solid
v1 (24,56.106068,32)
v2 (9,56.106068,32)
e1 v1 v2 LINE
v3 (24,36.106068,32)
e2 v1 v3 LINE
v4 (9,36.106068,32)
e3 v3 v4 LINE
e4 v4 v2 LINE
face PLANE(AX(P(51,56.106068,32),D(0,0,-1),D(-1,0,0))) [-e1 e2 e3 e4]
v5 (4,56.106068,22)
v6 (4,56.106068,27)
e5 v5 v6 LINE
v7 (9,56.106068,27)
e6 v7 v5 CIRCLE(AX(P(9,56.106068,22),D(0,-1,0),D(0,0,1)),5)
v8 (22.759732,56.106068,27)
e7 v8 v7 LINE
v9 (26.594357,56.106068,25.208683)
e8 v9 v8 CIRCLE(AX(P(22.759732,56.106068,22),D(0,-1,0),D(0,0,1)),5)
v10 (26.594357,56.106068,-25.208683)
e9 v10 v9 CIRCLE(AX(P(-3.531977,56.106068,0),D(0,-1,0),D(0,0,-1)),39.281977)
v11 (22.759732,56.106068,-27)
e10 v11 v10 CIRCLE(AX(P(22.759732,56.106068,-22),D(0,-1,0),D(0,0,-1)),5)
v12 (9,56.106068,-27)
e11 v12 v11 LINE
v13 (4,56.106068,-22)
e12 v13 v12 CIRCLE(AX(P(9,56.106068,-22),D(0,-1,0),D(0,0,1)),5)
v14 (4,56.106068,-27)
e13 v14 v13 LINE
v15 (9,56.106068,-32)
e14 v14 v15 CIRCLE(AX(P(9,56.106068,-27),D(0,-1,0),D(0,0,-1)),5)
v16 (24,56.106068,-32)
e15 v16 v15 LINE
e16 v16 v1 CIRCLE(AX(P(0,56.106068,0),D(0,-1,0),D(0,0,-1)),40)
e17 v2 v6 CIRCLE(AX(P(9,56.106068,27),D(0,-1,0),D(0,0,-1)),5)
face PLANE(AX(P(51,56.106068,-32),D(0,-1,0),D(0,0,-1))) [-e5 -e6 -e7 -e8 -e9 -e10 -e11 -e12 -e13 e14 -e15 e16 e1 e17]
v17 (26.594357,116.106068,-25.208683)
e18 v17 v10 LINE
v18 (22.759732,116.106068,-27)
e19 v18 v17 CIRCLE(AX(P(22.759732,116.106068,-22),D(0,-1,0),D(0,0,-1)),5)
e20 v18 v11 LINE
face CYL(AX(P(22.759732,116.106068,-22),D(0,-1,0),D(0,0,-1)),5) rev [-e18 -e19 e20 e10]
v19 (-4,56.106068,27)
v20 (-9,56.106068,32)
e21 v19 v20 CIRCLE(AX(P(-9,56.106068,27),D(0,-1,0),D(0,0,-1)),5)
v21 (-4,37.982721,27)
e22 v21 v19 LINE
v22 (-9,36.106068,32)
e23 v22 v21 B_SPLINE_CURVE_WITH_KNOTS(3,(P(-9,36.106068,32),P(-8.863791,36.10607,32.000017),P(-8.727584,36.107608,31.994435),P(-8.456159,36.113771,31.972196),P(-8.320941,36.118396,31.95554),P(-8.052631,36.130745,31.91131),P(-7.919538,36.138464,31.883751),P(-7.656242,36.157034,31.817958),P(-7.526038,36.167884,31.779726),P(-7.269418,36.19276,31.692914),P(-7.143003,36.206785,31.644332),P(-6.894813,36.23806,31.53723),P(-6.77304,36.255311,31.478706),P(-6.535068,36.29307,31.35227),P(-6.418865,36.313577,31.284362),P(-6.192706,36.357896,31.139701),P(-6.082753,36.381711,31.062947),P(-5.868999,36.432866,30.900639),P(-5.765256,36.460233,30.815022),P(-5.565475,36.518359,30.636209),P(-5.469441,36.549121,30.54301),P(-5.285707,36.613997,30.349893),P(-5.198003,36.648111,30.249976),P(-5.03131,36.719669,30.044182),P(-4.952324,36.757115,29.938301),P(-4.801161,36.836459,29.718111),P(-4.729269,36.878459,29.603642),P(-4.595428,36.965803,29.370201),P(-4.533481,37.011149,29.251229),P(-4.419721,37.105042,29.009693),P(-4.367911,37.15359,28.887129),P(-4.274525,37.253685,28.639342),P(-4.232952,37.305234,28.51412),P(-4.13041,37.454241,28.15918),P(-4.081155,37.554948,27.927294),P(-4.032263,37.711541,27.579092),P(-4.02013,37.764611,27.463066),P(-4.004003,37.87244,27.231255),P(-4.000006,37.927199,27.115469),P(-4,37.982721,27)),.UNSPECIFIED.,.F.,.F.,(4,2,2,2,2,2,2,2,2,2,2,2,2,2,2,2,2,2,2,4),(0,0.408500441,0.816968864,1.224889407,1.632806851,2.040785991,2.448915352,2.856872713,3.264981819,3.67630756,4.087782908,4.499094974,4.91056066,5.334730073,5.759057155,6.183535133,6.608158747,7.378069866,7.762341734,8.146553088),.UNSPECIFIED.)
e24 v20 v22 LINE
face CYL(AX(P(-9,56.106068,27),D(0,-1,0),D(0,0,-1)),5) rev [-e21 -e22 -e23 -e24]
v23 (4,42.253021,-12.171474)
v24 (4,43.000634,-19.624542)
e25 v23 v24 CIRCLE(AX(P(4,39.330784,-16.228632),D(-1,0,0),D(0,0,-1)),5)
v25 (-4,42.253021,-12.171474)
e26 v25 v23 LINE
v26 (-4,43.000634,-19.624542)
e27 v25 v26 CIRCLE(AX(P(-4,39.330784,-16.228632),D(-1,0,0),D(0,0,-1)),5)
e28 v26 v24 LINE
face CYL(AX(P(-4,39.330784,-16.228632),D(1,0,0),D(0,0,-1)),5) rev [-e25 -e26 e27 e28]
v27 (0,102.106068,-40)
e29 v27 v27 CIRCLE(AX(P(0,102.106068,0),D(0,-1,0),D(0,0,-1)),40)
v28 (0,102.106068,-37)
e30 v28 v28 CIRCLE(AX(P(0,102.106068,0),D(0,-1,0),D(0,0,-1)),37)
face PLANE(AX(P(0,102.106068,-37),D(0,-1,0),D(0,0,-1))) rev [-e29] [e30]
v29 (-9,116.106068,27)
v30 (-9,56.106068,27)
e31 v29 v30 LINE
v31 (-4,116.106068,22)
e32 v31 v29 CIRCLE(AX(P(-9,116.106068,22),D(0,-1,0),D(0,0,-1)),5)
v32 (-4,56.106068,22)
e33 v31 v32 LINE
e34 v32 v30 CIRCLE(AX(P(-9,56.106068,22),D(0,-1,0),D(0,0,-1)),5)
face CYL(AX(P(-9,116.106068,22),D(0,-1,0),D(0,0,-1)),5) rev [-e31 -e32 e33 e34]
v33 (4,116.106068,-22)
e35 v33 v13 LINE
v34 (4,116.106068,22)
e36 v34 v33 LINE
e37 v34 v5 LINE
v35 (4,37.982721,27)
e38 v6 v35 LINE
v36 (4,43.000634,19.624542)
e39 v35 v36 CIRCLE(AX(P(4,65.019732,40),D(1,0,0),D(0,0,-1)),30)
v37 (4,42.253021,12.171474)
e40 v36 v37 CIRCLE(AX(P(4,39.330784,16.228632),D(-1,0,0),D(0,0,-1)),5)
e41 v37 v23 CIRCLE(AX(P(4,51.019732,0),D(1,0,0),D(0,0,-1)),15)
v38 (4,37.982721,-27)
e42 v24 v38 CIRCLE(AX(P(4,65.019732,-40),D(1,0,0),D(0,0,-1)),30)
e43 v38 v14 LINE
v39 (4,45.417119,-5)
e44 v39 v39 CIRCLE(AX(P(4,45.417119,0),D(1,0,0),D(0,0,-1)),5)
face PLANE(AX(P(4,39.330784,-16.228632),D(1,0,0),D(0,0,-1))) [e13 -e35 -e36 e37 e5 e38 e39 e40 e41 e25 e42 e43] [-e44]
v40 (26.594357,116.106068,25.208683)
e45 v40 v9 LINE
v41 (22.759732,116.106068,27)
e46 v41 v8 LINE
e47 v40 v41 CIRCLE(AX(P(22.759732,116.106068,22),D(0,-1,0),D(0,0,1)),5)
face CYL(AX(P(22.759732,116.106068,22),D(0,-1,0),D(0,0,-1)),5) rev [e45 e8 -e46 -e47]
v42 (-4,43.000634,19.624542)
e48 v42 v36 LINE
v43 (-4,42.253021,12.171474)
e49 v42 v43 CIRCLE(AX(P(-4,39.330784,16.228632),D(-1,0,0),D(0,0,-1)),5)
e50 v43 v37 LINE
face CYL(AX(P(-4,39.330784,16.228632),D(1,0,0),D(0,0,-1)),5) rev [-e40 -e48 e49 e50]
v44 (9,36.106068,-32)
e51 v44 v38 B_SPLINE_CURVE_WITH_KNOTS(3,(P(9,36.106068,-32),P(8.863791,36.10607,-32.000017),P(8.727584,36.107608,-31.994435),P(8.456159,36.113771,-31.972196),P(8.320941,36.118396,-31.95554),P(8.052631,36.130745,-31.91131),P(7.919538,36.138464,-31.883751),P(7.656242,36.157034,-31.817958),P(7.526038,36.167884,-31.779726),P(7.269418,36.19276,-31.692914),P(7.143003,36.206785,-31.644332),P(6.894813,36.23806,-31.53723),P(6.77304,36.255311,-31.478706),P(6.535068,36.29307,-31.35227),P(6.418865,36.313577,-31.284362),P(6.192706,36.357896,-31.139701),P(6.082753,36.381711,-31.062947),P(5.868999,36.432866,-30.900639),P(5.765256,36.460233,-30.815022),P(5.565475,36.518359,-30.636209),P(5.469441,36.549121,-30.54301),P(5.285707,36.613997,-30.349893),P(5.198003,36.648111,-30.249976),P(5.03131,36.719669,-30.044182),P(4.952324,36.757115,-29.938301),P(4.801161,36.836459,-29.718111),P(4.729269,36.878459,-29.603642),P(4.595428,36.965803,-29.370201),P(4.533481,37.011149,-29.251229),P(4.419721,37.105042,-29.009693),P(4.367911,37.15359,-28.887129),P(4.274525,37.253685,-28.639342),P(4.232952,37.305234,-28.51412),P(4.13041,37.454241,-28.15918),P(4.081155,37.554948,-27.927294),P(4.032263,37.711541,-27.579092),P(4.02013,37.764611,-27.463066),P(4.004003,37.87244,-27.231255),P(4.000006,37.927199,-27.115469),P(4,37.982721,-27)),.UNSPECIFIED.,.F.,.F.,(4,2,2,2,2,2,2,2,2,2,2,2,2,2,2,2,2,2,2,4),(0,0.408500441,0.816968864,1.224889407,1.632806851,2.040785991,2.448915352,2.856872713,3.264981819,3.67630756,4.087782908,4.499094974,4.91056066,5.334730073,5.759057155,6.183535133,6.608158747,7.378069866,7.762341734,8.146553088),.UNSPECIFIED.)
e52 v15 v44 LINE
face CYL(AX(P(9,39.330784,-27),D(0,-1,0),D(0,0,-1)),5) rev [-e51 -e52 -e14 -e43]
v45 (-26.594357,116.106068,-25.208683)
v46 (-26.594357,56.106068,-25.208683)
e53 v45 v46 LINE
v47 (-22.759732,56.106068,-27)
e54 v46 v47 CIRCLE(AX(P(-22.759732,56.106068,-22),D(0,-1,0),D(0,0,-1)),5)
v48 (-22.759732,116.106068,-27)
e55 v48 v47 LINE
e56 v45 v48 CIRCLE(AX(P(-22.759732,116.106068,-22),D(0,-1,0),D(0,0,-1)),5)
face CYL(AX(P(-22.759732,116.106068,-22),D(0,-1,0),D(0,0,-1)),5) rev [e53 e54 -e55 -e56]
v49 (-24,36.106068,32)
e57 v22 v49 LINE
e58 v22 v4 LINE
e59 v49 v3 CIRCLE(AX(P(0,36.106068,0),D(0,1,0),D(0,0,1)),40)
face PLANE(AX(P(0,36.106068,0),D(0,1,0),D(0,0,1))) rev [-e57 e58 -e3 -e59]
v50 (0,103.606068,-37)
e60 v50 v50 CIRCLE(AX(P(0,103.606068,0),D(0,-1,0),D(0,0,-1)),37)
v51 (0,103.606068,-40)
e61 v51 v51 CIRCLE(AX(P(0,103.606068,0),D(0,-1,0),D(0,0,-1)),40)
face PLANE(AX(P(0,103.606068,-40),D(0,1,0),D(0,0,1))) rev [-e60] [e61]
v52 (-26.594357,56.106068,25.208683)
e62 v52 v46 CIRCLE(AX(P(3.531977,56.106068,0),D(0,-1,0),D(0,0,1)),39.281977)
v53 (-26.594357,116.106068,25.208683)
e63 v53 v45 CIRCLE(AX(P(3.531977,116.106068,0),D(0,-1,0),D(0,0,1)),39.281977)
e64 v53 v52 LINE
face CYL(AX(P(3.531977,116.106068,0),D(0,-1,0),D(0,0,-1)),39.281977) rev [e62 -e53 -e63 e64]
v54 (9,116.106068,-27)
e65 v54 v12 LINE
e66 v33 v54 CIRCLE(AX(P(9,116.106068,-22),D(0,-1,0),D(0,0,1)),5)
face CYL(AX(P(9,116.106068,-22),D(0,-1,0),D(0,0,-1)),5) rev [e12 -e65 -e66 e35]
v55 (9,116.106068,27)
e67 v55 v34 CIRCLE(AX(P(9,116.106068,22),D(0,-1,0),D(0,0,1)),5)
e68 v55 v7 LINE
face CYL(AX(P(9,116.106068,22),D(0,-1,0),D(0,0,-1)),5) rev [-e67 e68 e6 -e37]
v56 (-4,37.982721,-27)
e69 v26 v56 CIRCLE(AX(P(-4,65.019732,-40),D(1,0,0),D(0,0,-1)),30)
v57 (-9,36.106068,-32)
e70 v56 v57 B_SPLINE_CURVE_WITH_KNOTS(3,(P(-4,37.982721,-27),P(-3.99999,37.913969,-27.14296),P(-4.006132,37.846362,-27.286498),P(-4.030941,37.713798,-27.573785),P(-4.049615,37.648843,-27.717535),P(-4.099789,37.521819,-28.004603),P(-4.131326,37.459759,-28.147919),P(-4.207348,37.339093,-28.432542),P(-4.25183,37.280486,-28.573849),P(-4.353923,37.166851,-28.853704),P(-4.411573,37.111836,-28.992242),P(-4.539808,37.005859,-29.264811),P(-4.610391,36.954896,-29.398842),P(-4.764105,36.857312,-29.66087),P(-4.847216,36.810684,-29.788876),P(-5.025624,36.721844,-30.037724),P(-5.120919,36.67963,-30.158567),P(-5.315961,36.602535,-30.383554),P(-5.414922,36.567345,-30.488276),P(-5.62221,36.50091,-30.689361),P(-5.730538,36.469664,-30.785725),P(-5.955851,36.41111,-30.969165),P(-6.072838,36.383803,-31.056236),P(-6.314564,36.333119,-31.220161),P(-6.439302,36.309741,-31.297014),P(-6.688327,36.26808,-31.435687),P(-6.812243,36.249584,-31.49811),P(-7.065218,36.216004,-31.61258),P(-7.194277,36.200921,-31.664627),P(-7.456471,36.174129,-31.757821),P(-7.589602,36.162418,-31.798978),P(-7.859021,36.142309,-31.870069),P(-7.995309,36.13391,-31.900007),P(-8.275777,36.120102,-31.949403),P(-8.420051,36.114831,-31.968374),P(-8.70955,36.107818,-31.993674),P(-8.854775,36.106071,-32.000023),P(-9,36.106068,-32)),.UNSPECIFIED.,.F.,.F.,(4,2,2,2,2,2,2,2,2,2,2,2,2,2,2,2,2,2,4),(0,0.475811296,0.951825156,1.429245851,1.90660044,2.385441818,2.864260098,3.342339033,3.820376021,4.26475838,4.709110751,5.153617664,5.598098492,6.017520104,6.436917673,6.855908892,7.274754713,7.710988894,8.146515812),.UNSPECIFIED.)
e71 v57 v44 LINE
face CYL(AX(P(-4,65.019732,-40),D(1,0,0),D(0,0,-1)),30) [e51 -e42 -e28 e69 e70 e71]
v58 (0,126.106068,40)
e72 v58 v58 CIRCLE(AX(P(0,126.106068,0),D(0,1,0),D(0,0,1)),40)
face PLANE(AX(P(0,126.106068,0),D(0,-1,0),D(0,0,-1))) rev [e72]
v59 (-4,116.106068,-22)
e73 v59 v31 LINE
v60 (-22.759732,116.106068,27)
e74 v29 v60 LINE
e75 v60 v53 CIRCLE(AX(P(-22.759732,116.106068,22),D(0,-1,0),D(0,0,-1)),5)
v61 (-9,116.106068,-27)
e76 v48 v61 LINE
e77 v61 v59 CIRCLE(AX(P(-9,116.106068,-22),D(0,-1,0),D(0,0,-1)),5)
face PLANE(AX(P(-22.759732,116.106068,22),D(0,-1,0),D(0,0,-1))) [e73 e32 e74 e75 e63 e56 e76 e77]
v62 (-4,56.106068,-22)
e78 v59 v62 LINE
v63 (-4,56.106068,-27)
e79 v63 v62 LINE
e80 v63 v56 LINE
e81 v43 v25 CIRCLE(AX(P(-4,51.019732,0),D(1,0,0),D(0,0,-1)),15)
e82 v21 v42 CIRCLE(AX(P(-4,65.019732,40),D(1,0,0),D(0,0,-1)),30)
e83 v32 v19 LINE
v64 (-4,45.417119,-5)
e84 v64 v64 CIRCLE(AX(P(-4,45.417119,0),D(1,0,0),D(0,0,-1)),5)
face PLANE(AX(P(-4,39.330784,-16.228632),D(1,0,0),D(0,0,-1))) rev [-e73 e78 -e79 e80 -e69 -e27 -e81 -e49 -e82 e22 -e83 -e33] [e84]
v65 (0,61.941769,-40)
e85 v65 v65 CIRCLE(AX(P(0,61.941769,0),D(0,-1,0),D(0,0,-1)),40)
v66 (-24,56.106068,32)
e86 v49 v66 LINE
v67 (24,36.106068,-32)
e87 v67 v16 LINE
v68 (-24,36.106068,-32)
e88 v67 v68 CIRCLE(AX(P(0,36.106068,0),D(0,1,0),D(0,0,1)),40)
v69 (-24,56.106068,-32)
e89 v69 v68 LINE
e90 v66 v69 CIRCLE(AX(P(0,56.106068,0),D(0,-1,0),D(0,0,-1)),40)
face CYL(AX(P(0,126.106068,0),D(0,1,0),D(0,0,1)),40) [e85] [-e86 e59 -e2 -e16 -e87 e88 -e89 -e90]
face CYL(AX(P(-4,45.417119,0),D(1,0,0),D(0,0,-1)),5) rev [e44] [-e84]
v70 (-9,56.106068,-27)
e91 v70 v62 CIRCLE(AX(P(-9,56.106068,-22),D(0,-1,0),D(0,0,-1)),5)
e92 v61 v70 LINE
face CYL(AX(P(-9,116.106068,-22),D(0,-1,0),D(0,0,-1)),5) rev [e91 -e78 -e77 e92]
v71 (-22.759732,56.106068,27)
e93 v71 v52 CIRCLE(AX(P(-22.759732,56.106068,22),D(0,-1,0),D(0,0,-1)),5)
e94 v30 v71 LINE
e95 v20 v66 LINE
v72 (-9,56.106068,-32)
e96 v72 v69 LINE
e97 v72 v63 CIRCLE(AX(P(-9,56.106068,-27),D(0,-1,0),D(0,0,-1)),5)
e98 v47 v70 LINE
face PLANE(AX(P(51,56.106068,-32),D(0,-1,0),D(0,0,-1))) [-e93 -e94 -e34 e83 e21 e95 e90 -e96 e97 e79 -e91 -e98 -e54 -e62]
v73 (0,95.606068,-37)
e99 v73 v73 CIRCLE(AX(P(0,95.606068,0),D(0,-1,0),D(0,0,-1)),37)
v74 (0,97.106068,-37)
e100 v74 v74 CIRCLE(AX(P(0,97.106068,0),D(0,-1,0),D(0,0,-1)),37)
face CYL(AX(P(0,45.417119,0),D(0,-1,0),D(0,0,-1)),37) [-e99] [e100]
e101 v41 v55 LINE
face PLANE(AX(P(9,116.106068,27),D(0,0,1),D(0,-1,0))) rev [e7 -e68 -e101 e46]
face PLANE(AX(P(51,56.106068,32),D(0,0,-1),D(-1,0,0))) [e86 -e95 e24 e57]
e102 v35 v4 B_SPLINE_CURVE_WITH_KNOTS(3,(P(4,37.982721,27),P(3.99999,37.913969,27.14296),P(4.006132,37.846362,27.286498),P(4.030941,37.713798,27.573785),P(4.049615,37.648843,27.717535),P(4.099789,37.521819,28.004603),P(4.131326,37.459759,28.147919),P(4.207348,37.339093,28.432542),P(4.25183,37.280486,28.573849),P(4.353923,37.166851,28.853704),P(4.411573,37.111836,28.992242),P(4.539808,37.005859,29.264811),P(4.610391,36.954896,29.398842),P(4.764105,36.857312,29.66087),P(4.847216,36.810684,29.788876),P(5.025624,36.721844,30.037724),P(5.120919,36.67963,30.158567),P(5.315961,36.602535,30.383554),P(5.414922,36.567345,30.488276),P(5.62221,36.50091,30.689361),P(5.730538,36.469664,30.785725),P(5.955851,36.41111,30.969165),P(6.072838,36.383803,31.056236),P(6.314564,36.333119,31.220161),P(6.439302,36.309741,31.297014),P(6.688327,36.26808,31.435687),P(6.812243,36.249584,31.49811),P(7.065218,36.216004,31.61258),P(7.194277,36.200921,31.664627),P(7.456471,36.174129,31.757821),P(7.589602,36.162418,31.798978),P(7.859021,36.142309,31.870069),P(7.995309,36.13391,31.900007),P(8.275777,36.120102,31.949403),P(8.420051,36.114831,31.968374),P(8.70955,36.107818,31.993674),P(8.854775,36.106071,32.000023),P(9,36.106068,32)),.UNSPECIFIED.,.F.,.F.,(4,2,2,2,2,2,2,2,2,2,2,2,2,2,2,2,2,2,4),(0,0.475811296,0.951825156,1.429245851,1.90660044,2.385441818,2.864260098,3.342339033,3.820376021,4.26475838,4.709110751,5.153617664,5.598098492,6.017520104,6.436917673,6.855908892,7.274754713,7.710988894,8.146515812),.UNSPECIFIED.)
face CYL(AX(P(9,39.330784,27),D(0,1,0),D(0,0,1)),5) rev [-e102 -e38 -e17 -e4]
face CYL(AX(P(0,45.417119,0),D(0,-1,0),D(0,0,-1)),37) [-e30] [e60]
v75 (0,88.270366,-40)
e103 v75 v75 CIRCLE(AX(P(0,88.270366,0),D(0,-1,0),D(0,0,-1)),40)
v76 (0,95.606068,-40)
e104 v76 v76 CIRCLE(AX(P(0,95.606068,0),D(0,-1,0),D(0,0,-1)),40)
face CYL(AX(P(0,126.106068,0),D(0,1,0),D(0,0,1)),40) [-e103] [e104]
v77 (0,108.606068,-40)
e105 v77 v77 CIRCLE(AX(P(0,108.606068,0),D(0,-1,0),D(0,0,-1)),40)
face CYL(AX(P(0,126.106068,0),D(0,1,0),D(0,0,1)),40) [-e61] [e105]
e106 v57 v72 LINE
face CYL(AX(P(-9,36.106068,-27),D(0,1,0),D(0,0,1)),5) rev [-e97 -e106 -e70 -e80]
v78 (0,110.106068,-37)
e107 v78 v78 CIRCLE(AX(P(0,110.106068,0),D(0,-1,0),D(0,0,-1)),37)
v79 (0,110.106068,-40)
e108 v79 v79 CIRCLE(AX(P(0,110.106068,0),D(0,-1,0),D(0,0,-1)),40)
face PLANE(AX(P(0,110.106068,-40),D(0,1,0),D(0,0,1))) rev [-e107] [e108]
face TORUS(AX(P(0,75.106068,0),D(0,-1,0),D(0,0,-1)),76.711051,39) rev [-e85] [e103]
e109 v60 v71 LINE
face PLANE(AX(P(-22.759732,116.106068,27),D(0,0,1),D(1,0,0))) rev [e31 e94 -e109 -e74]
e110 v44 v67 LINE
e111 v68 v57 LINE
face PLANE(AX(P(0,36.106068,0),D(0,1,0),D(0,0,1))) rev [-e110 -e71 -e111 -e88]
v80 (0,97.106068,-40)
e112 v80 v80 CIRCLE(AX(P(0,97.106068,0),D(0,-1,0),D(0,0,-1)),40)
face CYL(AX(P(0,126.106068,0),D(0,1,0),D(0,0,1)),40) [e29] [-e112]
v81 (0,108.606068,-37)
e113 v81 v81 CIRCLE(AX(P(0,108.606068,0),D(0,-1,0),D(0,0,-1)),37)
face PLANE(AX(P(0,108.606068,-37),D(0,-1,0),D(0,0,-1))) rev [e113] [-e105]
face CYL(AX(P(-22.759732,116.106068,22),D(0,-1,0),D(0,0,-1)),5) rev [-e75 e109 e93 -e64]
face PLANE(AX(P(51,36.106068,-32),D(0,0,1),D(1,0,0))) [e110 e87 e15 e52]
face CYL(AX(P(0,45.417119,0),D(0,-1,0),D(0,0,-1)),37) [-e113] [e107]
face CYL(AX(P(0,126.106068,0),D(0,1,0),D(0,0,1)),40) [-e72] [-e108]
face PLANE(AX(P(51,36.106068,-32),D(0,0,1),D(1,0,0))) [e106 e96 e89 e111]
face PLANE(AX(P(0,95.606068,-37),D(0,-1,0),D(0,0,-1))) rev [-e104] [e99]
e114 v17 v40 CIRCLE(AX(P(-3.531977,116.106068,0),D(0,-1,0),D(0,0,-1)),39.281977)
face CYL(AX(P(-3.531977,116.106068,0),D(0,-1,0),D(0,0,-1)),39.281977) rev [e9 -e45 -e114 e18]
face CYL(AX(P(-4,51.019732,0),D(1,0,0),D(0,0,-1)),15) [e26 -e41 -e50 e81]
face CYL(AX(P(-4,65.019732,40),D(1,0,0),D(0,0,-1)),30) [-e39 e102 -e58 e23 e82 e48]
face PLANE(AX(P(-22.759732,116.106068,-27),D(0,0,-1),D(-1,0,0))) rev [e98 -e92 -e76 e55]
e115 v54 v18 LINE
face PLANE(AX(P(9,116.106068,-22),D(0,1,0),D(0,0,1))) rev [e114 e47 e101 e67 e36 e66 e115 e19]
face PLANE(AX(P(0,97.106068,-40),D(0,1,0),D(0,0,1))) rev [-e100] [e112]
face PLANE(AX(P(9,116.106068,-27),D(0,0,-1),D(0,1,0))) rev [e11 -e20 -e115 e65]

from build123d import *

# Parameters (mm, degrees)
SKETCH2_W                = 40
SKETCH2_H                = 70
SKETCH4_W                = 40
SKETCH4_H                = 20
CUT_EXTRUDE1_DEPTH       = 51
CUT_EXTRUDE1_DEPTH_BACK  = 47
SKETCH5_W                = 64
SKETCH5_H                = 20
BOSS_EXTRUDE1_DEPTH      = 4
BOSS_EXTRUDE1_DEPTH_BACK = 4
SKETCH3_R                = 5
FILLET2_R                = 5
FILLET3_R                = 5
CUT_EXTRUDE2_DEPTH       = 60
SKETCH8_W                = 3
SKETCH8_H                = 1.5


with BuildPart() as part:
    # Sketch2 → Revolve1 (revolve)
    with BuildSketch(Plane(origin=(0, 0, 0), x_dir=(0, 0, -1), z_dir=(1, 0, 0)), mode=Mode.PRIVATE) as revolve1_sk:
        with Locations((20, 91.106067618)):
            Rectangle(SKETCH2_W, SKETCH2_H)
    revolve(revolve1_sk.sketch.rotate(Axis((0, 126.106067618, 0), (0, -1, 0)), 180), axis=Axis((0, 126.106067618, 0), (0, -1, 0)))

    # Sketch4 → Revolve2 (revolve)
    with BuildSketch(Plane(origin=(0, 0, 0), x_dir=(0, 0, -1), z_dir=(1, 0, 0)), mode=Mode.PRIVATE) as revolve2_sk:
        with Locations((20, 46.106067618)):
            Rectangle(SKETCH4_W, SKETCH4_H)
    revolve(revolve2_sk.sketch.rotate(Axis((0, 56.106067618, 0), (0, -1, 0)), 180), axis=Axis((0, 56.106067618, 0), (0, -1, 0)))

    # Sketch5 → Cut-Extrude1 (cut, two sides: drawn at the far end of the back side and taken through both)
    with BuildSketch(Plane(origin=(0, 0, 0), x_dir=(0, 0, -1), z_dir=(1, 0, 0)).offset(-CUT_EXTRUDE1_DEPTH_BACK)):
        with Locations((0, 46.106067618)):
            Rectangle(SKETCH5_W, SKETCH5_H)
    extrude(amount=CUT_EXTRUDE1_DEPTH + CUT_EXTRUDE1_DEPTH_BACK, mode=Mode.SUBTRACT)

    # Sketch3 → Boss-Extrude1 (add, two sides: drawn at the far end of the back side and taken through both)
    with BuildSketch(Plane(origin=(0, 0, 0), x_dir=(0, 0, -1), z_dir=(1, 0, 0)).offset(-BOSS_EXTRUDE1_DEPTH_BACK)):
        with BuildLine():
            Line((-32, 56.106067618), (-14.456832295, 56.106067618))
            Line((-14.456832295, 56.106067618), (14.456832295, 56.106067618))
            Line((14.456832295, 56.106067618), (32, 56.106067618))
            Line((32, 56.106067618), (32, 36.106067618))
            ThreePointArc((32, 36.106067618), (25.399471898, 38.812393939), (19.624541582, 43.00063381))
            ThreePointArc((19.624541582, 43.00063381), (15.729589271, 44.305817394), (12.171473884, 42.25302111))
            ThreePointArc((12.171473884, 42.25302111), (0, 36.019732208), (-12.171473884, 42.25302111))
            ThreePointArc((-12.171473884, 42.25302111), (-15.729589271, 44.305817394), (-19.624541582, 43.00063381))
            ThreePointArc((-19.624541582, 43.00063381), (-25.399471898, 38.812393939), (-32, 36.106067618))
            Line((-32, 36.106067618), (-32, 56.106067618))
        make_face()
        with Locations((0, 45.417119487)):
            Circle(SKETCH3_R, mode=Mode.SUBTRACT)
    extrude(amount=BOSS_EXTRUDE1_DEPTH + BOSS_EXTRUDE1_DEPTH_BACK)

    # Fillet2
    # the kernel refuses this fillet: 5 mm, written as the material it adds along each edge
    with BuildSketch(Plane(origin=(4, 36.106067618, 32), x_dir=(1, 0, 0), z_dir=(0, 1, 0))) as fillet2_piece_1_section:
        with BuildLine():
            CenterArc((FILLET2_R, FILLET2_R), FILLET2_R, 180, 90)
            Line((0, FILLET2_R), (0, 0))
            Line((0, 0), (FILLET2_R, 0))
        make_face()
    fillet2_piece_1 = extrude(amount=32.5, mode=Mode.PRIVATE)
    fillet2_piece_1 = fillet2_piece_1 & Plane(origin=(5.143552766, 65.019732208, 40), x_dir=(0, -0.7339699466021848, -0.6791819472606629), z_dir=(-1, 0, 0)) * Cylinder(30, 85, mode=Mode.PRIVATE)
    add(fillet2_piece_1)

    # Fillet3
    # the kernel refuses this fillet: 5 mm, written as the material it adds along each edge
    with BuildSketch(Plane(origin=(-4, 36.106067618, 32), x_dir=(0, 0, -1), z_dir=(0, 1, 0))) as fillet3_piece_1_section:
        with BuildLine():
            CenterArc((FILLET3_R, FILLET3_R), FILLET3_R, 180, 90)
            Line((0, FILLET3_R), (0, 0))
            Line((0, 0), (FILLET3_R, 0))
        make_face()
    fillet3_piece_1 = extrude(amount=32.5, mode=Mode.PRIVATE)
    fillet3_piece_1 = fillet3_piece_1 & Plane(origin=(-5.143552934, 65.019732208, 40), x_dir=(0, -0.7339699466019316, -0.6791819472609367), z_dir=(-1, 0, 0)) * Cylinder(30, 85, mode=Mode.PRIVATE)
    add(fillet3_piece_1)
    with BuildSketch(Plane(origin=(-4, 68.606067618, -32), x_dir=(0, 0, 1), z_dir=(0, -1, 0))) as fillet3_piece_2_section:
        with BuildLine():
            CenterArc((FILLET3_R, FILLET3_R), FILLET3_R, 180, 90)
            Line((0, FILLET3_R), (0, 0))
            Line((0, 0), (FILLET3_R, 0))
        make_face()
    fillet3_piece_2 = extrude(amount=32.5, mode=Mode.PRIVATE)
    fillet3_piece_2 = fillet3_piece_2 & Plane(origin=(-5.131975571, 65.019732208, -40), x_dir=(0, -0.9637888196533986, 0.26666666666666256), z_dir=(-1, 0, 0)) * Cylinder(30, 85, mode=Mode.PRIVATE)
    add(fillet3_piece_2)
    with BuildSketch(Plane(origin=(4, 68.606067618, -32), x_dir=(0, 0, 1), z_dir=(0, -1, 0))) as fillet3_piece_3_section:
        with BuildLine():
            CenterArc((FILLET3_R, -FILLET3_R), FILLET3_R, 90, 90)
            Line((0, -FILLET3_R), (0, 0))
            Line((0, 0), (FILLET3_R, 0))
        make_face()
    fillet3_piece_3 = extrude(amount=32.5, mode=Mode.PRIVATE)
    fillet3_piece_3 = fillet3_piece_3 & Plane(origin=(5.131975571, 65.019732208, -40), x_dir=(0, -0.9637888196533986, 0.26666666666666256), z_dir=(-1, 0, 0)) * Cylinder(30, 85, mode=Mode.PRIVATE)
    add(fillet3_piece_3)

    # Sketch7 → Cut-Extrude2 (cut)
    with BuildSketch(Plane.XZ.offset(-56.106067618)):
        with BuildLine():
            Line((-4, -22), (-4, 22))
            ThreePointArc((-4, 22), (-5.464466094, 25.535533906), (-9, 27))
            Line((-9, 27), (-22.759731635, 27))
            ThreePointArc((-22.759731635, 27), (-24.875929217, 26.530089159), (-26.594357126, 25.208683117))
            ThreePointArc((-26.594357126, 25.208683117), (-35.75, 0), (-26.594357126, -25.208683117))
            ThreePointArc((-26.594357126, -25.208683117), (-24.875929217, -26.530089159), (-22.759731635, -27))
            Line((-22.759731635, -27), (-9, -27))
            ThreePointArc((-9, -27), (-5.464466094, -25.535533906), (-4, -22))
        make_face()
        with BuildLine():
            Line((9, -27), (22.759731635, -27))
            ThreePointArc((22.759731635, -27), (24.875929217, -26.530089159), (26.594357126, -25.208683117))
            ThreePointArc((26.594357126, -25.208683117), (35.75, 0), (26.594357126, 25.208683117))
            ThreePointArc((26.594357126, 25.208683117), (24.875929217, 26.530089159), (22.759731635, 27))
            Line((22.759731635, 27), (9, 27))
            ThreePointArc((9, 27), (5.464466094, 25.535533906), (4, 22))
            Line((4, 22), (4, -22))
            ThreePointArc((4, -22), (5.464466094, -25.535533906), (9, -27))
        make_face()
    extrude(amount=-CUT_EXTRUDE2_DEPTH, mode=Mode.SUBTRACT)

    # Sketch8 → Cut-Revolve1 (revolve, cut)
    with BuildSketch(Plane(origin=(0, 0, 0), x_dir=(0, 0, -1), z_dir=(1, 0, 0))):
        with Locations((38.5, 109.356067618)):
            Rectangle(SKETCH8_W, SKETCH8_H)
        with Locations((38.5, 102.856067618)):
            Rectangle(SKETCH8_W, SKETCH8_H)
        with BuildLine():
            Line((40, 61.941769102), (40, 88.270366135))
            ThreePointArc((40, 88.270366135), (37.711050715, 75.106067618), (40, 61.941769102))
        make_face()
        with Locations((38.5, 96.356067618)):
            Rectangle(SKETCH8_W, SKETCH8_H)
    revolve(axis=Axis((0, 45.417119487, 0), (0, 1, 0)), mode=Mode.SUBTRACT)


solid = part.part
